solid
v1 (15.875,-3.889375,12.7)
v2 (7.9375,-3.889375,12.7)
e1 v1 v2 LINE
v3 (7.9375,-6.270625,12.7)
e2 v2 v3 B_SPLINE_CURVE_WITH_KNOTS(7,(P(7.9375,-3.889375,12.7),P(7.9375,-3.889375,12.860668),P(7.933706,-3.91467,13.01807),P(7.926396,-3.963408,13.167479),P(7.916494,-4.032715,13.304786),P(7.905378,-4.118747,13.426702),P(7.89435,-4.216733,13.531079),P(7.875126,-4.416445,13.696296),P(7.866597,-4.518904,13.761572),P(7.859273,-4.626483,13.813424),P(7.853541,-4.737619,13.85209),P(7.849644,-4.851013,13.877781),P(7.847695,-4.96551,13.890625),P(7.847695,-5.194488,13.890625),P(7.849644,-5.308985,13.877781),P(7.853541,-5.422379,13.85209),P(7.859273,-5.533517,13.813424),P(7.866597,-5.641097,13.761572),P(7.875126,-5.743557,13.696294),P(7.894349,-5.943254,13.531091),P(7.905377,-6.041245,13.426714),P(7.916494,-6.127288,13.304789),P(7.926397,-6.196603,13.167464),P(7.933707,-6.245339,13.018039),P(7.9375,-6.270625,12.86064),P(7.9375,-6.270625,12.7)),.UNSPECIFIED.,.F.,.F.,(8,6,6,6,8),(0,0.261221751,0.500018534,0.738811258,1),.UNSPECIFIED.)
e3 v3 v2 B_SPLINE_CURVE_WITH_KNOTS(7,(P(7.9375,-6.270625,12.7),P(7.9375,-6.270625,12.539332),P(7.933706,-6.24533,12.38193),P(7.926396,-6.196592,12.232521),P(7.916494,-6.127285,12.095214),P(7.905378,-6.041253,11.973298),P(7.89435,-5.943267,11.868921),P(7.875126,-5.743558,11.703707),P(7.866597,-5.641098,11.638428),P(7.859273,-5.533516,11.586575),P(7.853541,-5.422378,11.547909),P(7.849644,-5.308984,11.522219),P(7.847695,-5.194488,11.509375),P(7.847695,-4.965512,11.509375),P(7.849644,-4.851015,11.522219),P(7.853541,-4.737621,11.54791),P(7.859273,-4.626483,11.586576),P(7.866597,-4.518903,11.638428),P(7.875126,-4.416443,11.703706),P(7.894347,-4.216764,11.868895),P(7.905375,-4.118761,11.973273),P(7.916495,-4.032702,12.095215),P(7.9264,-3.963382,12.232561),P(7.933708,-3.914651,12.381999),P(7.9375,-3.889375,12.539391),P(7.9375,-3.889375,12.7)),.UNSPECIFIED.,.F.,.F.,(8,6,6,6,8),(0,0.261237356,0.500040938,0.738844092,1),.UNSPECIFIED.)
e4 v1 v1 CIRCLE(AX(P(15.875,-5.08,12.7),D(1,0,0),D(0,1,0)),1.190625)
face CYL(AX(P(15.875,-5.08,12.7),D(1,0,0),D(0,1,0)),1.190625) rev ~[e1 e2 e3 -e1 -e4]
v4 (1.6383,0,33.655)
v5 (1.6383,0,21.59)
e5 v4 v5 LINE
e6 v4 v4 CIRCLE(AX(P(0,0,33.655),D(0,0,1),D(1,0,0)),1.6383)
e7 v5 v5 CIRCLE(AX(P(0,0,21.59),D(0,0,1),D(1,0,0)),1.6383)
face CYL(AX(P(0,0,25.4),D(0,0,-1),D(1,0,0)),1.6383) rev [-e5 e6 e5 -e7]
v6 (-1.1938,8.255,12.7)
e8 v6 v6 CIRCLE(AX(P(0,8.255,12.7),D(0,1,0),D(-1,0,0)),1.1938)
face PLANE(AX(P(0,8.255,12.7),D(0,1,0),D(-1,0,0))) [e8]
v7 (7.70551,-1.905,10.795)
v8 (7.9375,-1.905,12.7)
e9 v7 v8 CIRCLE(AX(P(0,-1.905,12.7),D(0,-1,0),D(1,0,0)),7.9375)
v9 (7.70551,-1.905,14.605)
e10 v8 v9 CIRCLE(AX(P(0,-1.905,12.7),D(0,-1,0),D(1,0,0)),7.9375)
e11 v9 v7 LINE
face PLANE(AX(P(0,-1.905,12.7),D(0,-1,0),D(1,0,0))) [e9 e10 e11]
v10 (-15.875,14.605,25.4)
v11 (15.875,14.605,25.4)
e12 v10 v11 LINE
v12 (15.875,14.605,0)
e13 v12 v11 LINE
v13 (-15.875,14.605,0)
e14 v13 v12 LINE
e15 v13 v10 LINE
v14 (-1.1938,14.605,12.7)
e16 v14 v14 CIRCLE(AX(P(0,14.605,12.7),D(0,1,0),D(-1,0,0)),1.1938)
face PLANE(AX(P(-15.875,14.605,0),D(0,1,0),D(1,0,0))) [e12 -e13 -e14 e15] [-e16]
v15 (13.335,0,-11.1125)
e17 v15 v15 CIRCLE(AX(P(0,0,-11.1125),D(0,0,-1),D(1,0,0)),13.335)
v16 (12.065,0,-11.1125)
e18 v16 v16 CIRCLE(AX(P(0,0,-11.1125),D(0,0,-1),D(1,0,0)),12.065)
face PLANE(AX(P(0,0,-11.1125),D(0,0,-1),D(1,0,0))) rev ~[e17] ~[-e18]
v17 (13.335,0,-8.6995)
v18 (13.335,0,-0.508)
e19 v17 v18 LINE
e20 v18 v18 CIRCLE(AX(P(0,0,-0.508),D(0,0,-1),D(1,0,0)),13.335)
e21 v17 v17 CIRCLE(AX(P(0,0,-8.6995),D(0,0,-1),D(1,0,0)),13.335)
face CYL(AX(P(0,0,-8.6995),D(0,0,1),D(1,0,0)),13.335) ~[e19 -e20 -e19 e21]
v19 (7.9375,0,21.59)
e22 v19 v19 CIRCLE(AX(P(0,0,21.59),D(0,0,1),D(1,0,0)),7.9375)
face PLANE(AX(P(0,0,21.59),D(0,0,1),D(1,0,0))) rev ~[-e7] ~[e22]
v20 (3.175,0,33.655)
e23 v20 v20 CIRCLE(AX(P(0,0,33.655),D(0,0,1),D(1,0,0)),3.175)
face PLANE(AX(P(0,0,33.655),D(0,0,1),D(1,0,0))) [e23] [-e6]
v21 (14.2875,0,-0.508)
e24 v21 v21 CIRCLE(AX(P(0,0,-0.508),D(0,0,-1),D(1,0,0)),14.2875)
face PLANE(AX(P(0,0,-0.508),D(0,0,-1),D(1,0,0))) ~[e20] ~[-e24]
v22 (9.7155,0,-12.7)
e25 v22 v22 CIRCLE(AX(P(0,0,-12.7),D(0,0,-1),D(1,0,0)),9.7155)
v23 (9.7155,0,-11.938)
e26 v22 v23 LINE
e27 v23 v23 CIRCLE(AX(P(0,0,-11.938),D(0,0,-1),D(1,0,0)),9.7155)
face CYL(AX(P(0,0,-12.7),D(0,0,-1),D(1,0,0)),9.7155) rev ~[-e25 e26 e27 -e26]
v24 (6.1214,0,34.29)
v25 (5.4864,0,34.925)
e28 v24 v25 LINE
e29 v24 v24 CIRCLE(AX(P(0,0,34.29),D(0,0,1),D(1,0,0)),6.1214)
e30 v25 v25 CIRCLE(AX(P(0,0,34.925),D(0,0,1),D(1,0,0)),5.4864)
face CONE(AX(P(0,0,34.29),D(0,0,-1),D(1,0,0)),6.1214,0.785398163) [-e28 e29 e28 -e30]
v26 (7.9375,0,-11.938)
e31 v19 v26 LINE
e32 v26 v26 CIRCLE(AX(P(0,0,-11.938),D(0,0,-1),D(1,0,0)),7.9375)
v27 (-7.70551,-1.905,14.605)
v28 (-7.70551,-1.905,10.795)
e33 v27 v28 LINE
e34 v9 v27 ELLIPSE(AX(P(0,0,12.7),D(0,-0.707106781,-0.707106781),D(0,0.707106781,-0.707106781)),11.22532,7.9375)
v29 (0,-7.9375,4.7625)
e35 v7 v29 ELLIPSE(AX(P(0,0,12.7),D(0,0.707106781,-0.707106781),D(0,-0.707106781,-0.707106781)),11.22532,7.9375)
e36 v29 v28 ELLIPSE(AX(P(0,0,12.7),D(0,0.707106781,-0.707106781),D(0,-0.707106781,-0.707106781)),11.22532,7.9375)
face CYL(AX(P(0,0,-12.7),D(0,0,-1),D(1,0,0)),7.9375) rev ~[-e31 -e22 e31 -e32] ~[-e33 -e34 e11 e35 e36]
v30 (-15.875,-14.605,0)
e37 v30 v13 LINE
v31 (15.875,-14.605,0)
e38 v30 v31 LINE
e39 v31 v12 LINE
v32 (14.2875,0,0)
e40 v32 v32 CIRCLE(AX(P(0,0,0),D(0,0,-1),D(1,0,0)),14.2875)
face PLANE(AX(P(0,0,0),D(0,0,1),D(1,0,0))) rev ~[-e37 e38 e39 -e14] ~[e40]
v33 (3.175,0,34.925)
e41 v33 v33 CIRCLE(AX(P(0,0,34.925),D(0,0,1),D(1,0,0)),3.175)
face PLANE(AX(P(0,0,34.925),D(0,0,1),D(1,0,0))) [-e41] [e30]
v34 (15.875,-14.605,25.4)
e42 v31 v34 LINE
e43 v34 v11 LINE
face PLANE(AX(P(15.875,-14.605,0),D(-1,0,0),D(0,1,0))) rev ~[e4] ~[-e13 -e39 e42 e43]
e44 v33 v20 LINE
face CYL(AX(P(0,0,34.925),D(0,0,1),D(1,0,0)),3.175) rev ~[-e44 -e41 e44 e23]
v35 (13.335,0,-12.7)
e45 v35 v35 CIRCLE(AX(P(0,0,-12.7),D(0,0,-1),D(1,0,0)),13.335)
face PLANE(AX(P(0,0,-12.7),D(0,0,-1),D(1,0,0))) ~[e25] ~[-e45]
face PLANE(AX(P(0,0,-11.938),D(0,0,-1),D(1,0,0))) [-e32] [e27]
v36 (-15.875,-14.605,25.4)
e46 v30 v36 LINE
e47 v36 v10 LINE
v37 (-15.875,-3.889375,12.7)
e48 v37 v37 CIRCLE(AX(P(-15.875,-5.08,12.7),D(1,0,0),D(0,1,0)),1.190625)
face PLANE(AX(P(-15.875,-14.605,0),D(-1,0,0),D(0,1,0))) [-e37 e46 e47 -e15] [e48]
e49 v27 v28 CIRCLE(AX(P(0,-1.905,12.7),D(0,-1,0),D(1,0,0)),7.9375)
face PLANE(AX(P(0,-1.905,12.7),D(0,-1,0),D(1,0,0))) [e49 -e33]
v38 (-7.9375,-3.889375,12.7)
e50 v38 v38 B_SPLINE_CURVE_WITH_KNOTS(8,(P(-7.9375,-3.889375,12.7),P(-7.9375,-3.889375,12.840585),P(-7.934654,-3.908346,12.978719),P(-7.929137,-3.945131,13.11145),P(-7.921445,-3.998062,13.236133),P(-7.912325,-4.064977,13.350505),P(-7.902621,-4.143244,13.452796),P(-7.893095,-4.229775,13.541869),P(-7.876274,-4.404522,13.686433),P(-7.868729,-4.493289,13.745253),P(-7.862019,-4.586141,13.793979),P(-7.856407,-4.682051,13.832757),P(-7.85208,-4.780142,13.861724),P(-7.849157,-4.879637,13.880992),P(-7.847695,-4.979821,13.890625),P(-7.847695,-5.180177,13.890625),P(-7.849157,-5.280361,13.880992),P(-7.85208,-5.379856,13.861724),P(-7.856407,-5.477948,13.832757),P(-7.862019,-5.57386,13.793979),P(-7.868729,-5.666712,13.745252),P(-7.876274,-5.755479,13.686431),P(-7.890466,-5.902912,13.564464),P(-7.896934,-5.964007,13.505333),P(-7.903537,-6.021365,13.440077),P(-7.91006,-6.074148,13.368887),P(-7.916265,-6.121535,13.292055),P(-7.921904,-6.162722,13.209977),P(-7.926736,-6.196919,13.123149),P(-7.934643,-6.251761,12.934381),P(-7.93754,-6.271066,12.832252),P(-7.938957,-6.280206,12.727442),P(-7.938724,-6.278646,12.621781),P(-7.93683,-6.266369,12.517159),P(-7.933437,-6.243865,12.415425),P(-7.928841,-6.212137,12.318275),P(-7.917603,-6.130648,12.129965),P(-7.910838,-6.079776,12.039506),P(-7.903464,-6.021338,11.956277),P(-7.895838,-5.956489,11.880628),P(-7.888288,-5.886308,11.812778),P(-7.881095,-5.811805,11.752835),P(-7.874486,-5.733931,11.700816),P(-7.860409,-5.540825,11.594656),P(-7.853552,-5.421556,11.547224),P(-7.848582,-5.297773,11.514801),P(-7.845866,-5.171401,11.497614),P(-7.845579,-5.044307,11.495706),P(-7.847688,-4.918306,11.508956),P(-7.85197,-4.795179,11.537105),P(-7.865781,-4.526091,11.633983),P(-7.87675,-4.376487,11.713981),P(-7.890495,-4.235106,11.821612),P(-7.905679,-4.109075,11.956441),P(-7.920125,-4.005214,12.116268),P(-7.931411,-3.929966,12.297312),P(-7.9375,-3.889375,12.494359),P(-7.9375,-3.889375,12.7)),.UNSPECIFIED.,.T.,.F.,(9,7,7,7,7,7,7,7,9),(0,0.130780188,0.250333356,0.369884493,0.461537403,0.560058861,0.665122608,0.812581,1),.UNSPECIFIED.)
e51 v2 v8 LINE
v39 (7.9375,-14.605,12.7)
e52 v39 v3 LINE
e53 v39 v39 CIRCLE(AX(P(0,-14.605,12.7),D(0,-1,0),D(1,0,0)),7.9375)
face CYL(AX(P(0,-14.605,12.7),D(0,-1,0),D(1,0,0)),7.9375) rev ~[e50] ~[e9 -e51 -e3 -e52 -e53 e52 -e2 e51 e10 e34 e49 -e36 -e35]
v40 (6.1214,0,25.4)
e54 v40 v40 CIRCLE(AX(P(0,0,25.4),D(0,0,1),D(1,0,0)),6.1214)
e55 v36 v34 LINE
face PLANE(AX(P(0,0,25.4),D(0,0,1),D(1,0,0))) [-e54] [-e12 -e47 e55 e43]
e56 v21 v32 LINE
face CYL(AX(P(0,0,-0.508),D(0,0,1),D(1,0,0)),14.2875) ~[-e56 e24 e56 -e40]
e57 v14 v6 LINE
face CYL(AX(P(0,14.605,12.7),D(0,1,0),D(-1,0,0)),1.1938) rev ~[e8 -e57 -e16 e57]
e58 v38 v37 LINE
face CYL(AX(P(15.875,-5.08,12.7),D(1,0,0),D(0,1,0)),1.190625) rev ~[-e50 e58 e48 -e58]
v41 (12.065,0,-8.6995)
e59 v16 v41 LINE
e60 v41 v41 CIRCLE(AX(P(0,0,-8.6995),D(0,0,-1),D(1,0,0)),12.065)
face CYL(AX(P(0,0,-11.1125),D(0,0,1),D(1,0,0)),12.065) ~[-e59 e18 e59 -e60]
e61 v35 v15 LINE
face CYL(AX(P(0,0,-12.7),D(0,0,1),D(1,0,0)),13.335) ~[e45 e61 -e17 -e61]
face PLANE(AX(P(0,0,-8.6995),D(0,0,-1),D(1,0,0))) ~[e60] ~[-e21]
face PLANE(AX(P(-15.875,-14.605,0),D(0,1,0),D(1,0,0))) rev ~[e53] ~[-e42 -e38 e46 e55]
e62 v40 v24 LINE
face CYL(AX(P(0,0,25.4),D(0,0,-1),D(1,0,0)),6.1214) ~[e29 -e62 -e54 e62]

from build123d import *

# Parameters (mm, degrees)
F0_W      = 31.75
F0_H      = 29.21
F0_R      = 14.2875
F0_R_2    = 13.335
F0_R_3    = 7.9375
F0_R_4    = 1.6383
F1_DEPTH  = 25.4
F2_R      = 6.1214
F2_R_2    = 1.6383
F3_DEPTH  = 9.525
F4_R      = 3.175
F4_R_2    = 1.6383
F5_DEPTH  = 1.27
F7_DEPTH  = 21.59
F8_SIZE   = 0.635
F9_R      = 7.9375
F10_DEPTH = 12.7
F11_R     = 1.1938
F12_DEPTH = 6.35
F13_R     = 1.190625
F14_DEPTH = 31.751
F17_R     = 7.9375
F18_DEPTH = 12.7
F19_R     = 9.7155
F20_DEPTH = 0.762


# Not quite as in the source:
# - a feature names something its author has since deleted; it is built from what else it names


with BuildPart() as f1:
    # F0 (on Top) → F1 (new body)
    with BuildSketch(Plane.XY):
        Rectangle(F0_W, F0_H)
        Circle(F0_R, mode=Mode.SUBTRACT)
        Circle(F0_R)
        Circle(F0_R_2, mode=Mode.SUBTRACT)
        Circle(F0_R_2)
        Circle(F0_R_3, mode=Mode.SUBTRACT)
        Circle(F0_R_3)
        Circle(F0_R_4, mode=Mode.SUBTRACT)
    extrude(amount=F1_DEPTH)

    # F2 (on face) → F3 (join)
    with BuildSketch(Plane.XY.offset(25.4)):
        Circle(F2_R)
        Circle(F2_R_2, mode=Mode.SUBTRACT)
    extrude(amount=F3_DEPTH)

    # F4 (on face) → F5 (cut)
    with BuildSketch(Plane.XY.offset(34.925)):
        Circle(F4_R)
        Circle(F4_R_2, mode=Mode.SUBTRACT)
    extrude(amount=-F5_DEPTH, mode=Mode.SUBTRACT)

    # F0 (on Top) → F7 (cut)
    with BuildSketch(Plane.XY):
        Circle(F0_R_3)
        Circle(F0_R_4, mode=Mode.SUBTRACT)
    extrude(amount=F7_DEPTH, mode=Mode.SUBTRACT)

    # F8
    f8_edges = [f1.edges().sort_by_distance(p)[0] for p in [
        (-6.1214, 0, 34.925),
    ]]
    chamfer(f8_edges, length=F8_SIZE)

    # F9 (on face) → F10 (cut)
    with BuildSketch(Plane.XZ.offset(14.605)):
        with Locations((0, 12.7)):
            Circle(F9_R)
    extrude(amount=-F10_DEPTH, mode=Mode.SUBTRACT)

    # F11 (on face) → F12 (cut)
    with BuildSketch(Plane(origin=(0, 14.605, 0), x_dir=(-1, 0, 0), z_dir=(0, 1, 0))):
        with Locations((0, 12.7)):
            Circle(F11_R)
    extrude(amount=-F12_DEPTH, mode=Mode.SUBTRACT)

    # F13 (on face) → F14 (cut, through all)
    with BuildSketch(Plane.YZ.offset(15.875)):
        with Locations((-5.08, 12.7)):
            Circle(F13_R)
    extrude(amount=-F14_DEPTH, mode=Mode.SUBTRACT)

    # F15 (on Front) → F16 (revolve)
    with BuildSketch(Plane.XZ):
        Polygon((0, 0), (0, -12.7), (13.335, -12.7), (13.335, -11.1125), (12.065, -11.1125), (12.065, -8.6995), (13.335, -8.6995), (13.335, -0.508), (14.2875, -0.508), (14.2875, 0), align=None)
    revolve(axis=Axis((0, 0, -6.35), (0, 0, -1)))

    # F17 (on face) → F18 (cut)
    with BuildSketch(Plane(origin=(0, 0, -12.7), x_dir=(1, 0, 0), z_dir=(0, 0, -1))):
        Circle(F17_R)
    extrude(amount=-F18_DEPTH, mode=Mode.SUBTRACT)

    # F19 (on face) → F20 (cut)
    with BuildSketch(Plane(origin=(0, 0, -12.7), x_dir=(1, 0, 0), z_dir=(0, 0, -1))):
        Circle(F19_R)
    extrude(amount=-F20_DEPTH, mode=Mode.SUBTRACT)


solid = f1.part
